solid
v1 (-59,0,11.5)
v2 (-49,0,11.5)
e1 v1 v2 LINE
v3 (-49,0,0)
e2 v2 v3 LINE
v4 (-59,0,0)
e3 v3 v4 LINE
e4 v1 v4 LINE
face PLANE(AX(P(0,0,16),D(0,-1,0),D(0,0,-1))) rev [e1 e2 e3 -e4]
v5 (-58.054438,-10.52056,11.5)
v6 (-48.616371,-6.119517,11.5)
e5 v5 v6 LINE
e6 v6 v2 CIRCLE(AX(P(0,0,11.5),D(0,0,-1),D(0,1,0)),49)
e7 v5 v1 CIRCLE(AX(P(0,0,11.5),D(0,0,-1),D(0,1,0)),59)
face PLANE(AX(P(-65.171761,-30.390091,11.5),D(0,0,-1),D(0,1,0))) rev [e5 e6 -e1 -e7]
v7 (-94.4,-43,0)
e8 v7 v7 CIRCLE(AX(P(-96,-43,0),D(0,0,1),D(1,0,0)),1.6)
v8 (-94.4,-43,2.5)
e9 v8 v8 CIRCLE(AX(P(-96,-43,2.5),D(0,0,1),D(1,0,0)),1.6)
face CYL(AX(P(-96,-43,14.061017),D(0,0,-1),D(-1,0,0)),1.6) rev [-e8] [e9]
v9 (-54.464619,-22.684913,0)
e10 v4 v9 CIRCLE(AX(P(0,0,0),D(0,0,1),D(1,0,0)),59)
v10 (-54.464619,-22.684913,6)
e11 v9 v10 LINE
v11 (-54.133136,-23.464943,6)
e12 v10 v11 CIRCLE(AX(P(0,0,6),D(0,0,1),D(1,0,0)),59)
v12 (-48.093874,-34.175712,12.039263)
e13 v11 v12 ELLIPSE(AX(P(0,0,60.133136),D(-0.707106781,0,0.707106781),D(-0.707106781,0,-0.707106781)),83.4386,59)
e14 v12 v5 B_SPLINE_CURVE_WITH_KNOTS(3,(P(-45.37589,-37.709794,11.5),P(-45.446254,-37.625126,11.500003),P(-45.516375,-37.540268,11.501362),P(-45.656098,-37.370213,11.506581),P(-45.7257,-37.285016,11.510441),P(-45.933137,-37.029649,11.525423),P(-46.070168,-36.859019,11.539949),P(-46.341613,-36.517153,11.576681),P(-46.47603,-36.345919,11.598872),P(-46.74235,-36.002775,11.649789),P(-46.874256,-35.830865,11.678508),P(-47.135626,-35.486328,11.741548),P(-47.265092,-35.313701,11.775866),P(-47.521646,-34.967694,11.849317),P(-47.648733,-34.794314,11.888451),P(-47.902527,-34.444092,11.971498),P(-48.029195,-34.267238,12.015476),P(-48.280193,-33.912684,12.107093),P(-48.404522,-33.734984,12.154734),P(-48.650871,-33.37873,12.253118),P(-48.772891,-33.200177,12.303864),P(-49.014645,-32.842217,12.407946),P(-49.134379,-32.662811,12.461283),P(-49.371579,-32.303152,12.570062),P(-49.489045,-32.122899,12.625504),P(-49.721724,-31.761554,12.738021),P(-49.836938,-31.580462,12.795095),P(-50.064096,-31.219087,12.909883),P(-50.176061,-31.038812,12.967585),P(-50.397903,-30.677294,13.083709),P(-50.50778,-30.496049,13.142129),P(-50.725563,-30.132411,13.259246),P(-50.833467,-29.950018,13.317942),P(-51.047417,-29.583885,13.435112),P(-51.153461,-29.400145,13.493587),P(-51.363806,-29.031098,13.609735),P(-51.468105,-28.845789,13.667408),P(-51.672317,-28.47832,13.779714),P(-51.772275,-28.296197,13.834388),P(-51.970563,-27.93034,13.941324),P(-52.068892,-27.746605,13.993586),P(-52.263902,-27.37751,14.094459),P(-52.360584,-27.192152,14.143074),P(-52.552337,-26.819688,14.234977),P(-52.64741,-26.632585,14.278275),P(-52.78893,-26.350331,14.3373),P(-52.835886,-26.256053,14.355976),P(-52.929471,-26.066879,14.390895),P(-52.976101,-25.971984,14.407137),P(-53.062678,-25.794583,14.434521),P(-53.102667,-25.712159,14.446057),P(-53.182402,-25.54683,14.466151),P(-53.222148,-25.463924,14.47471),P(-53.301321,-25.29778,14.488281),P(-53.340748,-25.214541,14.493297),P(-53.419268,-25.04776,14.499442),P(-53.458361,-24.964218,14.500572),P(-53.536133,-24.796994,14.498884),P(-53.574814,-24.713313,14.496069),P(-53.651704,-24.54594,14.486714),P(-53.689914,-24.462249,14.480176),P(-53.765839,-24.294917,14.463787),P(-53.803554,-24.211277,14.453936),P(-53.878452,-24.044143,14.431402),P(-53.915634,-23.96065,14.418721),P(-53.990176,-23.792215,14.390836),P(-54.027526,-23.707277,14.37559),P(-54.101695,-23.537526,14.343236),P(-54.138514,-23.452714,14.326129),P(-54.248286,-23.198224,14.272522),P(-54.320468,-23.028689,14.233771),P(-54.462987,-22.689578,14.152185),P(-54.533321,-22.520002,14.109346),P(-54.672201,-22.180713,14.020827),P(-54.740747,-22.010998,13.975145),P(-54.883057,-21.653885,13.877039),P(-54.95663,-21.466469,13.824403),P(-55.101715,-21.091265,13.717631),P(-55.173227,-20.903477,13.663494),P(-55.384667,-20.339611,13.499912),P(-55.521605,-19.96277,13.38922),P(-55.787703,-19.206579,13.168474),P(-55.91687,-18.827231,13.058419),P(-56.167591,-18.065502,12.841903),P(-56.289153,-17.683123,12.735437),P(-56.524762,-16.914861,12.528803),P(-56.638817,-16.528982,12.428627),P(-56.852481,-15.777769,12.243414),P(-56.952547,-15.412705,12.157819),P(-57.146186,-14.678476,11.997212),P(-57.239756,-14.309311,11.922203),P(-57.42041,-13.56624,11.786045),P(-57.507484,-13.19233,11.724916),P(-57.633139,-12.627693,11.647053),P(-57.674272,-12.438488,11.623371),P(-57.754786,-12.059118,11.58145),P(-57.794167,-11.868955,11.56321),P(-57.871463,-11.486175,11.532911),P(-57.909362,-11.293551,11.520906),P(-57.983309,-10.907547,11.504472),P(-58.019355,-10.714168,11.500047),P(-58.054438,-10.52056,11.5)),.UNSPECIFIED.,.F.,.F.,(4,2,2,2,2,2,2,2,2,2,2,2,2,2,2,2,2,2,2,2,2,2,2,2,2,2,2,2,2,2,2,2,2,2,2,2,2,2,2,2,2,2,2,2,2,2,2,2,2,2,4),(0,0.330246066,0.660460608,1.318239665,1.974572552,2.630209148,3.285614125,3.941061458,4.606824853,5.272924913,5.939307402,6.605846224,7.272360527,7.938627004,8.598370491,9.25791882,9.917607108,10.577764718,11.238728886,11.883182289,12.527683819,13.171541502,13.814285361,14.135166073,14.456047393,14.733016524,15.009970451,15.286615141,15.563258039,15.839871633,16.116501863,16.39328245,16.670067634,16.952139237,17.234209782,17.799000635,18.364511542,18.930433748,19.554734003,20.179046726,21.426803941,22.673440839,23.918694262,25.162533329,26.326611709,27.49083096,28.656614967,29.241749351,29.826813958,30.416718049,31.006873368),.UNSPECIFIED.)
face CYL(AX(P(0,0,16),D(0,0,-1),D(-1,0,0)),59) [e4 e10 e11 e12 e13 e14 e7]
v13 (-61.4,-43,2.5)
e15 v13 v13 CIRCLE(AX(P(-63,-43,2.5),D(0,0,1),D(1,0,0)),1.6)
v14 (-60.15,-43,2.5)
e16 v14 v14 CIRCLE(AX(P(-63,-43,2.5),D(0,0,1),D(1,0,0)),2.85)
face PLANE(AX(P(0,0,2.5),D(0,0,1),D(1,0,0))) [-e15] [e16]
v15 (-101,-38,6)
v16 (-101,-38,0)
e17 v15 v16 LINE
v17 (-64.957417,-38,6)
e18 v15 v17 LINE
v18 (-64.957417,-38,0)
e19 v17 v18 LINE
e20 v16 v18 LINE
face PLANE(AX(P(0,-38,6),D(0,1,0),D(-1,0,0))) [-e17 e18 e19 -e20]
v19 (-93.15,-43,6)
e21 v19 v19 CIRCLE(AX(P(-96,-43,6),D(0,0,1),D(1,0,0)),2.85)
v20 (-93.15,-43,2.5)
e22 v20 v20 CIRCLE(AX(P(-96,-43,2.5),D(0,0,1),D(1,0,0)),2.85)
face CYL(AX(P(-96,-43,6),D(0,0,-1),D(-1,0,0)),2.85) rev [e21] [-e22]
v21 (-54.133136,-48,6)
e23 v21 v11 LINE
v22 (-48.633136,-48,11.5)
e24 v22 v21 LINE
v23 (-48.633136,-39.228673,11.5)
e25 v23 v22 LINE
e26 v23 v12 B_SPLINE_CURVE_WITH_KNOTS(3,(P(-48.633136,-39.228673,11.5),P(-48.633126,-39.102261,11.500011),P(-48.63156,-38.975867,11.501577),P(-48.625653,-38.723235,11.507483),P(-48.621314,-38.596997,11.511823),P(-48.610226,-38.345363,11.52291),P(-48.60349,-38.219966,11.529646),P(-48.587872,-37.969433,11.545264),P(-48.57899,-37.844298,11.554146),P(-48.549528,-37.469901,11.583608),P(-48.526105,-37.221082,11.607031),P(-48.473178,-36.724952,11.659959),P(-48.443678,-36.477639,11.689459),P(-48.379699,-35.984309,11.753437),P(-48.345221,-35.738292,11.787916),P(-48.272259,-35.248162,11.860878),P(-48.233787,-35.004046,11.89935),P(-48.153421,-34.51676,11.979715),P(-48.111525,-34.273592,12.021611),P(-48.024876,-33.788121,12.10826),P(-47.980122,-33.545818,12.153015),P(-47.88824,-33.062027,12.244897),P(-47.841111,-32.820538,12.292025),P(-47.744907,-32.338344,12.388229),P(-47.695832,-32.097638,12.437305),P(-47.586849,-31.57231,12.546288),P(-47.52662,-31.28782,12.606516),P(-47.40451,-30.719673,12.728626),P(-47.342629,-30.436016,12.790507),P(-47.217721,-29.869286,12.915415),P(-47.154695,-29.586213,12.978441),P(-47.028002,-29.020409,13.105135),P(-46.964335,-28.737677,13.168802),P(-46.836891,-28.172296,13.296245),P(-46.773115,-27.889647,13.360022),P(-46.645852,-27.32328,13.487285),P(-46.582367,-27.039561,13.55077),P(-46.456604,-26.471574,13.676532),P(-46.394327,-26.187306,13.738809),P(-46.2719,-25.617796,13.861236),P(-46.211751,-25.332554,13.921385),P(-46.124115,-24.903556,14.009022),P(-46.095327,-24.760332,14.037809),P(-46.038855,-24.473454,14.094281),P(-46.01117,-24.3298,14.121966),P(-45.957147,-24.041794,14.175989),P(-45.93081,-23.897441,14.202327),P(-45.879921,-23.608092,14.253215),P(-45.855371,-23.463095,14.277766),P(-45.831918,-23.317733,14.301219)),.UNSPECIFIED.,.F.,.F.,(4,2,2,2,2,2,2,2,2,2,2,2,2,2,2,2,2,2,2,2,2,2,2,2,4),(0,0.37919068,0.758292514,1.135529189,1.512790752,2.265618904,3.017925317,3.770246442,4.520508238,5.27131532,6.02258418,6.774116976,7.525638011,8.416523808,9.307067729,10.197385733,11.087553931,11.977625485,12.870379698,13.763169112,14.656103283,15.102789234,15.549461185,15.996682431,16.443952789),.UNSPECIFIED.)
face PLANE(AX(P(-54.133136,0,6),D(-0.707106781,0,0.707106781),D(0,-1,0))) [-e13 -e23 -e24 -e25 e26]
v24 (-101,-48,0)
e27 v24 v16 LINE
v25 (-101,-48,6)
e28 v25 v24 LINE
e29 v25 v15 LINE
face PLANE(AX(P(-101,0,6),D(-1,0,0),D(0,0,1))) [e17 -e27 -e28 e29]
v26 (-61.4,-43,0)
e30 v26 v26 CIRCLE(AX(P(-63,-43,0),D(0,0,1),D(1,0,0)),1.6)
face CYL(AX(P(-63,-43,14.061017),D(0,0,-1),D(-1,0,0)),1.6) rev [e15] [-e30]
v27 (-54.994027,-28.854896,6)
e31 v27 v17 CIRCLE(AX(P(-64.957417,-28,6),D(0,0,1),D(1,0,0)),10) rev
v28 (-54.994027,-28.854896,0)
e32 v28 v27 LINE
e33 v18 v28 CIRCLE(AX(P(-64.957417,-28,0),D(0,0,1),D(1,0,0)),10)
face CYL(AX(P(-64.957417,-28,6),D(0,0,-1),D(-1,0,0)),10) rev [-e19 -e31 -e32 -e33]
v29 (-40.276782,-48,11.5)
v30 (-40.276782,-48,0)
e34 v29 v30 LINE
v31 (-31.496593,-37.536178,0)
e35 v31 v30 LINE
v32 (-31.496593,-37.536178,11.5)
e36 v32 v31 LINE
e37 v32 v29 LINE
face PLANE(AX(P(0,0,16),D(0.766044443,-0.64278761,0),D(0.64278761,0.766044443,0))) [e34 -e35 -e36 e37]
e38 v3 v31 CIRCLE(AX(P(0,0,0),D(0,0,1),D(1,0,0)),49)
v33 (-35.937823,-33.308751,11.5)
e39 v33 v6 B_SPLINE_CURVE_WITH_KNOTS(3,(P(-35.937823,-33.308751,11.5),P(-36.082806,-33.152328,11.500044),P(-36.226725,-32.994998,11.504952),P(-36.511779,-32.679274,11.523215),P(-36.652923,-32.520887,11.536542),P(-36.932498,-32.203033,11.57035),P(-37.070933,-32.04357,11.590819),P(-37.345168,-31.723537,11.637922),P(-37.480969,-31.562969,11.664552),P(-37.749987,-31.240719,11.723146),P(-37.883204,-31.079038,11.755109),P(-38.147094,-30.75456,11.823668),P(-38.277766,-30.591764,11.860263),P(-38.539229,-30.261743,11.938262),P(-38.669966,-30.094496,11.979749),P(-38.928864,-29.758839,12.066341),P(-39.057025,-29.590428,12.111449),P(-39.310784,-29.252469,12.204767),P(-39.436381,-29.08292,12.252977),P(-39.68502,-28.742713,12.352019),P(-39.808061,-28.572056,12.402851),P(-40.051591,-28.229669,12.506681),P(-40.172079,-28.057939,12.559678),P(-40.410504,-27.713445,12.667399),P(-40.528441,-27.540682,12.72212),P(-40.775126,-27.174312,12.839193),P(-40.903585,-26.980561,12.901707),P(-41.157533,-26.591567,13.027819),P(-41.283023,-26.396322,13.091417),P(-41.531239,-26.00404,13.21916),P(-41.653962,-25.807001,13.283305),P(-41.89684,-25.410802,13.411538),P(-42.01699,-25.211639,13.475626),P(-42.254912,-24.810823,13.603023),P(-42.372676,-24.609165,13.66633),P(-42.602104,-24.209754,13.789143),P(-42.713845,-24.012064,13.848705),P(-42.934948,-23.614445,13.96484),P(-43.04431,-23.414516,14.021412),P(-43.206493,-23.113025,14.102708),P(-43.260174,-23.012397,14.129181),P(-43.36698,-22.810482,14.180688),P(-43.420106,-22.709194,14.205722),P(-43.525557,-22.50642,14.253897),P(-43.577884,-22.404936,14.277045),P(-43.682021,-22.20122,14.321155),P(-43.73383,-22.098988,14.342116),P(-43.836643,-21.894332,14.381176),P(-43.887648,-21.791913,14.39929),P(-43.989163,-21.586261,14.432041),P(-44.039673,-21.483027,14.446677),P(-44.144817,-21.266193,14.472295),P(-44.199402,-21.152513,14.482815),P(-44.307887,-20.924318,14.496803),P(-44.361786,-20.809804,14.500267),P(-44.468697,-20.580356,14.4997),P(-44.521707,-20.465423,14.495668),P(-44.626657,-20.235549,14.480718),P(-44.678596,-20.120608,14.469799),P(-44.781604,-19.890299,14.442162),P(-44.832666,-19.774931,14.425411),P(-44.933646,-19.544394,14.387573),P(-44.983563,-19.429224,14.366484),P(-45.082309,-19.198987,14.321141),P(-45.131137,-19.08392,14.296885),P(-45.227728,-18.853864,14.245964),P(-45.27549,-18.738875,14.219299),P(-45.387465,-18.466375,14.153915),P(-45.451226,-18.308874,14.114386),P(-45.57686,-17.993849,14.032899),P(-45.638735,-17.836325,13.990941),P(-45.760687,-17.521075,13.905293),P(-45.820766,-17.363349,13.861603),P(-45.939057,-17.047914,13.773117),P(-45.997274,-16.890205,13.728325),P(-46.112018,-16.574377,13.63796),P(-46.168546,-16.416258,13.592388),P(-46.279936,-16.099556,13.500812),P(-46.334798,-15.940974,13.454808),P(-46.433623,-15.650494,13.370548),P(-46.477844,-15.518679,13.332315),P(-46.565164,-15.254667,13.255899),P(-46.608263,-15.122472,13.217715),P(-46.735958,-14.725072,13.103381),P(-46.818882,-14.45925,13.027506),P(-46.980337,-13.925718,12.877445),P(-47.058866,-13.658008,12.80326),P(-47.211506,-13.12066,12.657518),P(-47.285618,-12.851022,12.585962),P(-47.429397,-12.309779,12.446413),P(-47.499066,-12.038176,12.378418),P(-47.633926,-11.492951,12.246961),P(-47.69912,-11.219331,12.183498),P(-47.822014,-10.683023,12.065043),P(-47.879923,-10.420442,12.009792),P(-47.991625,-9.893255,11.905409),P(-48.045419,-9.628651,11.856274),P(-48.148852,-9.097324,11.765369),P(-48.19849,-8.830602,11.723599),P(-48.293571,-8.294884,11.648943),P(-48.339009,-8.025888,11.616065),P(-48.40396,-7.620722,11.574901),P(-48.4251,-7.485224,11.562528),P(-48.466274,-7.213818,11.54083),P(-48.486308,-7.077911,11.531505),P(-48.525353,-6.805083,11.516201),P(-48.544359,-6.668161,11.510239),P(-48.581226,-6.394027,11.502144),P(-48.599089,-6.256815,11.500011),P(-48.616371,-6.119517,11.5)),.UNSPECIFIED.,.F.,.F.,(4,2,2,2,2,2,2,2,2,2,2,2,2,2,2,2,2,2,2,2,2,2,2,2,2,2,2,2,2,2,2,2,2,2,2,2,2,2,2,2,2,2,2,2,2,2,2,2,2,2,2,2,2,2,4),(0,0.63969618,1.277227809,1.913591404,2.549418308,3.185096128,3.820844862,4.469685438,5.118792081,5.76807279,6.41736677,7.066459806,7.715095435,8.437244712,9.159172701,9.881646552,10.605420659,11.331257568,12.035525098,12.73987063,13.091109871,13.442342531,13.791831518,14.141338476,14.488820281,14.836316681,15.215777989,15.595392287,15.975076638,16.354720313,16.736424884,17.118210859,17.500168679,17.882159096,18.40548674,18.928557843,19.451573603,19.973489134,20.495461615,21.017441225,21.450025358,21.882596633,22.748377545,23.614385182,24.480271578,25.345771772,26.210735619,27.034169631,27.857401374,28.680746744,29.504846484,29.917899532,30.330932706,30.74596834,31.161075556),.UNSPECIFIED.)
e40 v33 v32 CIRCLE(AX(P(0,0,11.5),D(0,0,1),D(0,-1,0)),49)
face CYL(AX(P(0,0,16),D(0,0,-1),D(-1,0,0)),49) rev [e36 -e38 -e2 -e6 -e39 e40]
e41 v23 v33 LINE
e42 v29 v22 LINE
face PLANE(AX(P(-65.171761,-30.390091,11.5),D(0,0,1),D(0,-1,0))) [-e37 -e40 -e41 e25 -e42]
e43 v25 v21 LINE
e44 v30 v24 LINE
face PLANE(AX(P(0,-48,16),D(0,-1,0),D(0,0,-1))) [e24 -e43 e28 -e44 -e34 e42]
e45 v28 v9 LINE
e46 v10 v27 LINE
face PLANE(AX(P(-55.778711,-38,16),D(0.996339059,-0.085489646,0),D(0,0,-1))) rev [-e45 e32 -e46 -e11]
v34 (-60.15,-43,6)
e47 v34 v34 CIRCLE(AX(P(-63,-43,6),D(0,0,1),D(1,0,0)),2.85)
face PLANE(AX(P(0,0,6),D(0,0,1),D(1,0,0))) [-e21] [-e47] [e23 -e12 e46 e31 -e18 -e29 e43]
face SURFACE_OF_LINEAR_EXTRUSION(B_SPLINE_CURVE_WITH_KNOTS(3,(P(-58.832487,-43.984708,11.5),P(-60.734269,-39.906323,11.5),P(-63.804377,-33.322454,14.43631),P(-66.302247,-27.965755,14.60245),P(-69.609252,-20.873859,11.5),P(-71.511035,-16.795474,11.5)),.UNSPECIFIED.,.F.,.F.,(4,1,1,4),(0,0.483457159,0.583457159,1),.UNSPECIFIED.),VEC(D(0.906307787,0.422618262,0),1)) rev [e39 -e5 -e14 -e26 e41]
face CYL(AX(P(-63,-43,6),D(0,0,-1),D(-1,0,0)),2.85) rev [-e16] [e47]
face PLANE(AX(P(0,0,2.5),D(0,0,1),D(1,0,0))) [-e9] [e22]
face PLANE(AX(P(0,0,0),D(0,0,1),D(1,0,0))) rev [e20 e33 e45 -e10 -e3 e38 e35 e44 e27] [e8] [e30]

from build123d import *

# Parameters (mm, degrees)
BOSS_EXTRUDE1_DEPTH = 16
SKETCH1_3_W         = 10
SKETCH1_3_H         = 55.866863614
SKETCH1_3_R         = 2.85
BOSS_EXTRUDE2_DEPTH = 6
SKETCH1_4_R         = 2.85
SKETCH1_4_R_2       = 1.6
BOSS_EXTRUDE3_DEPTH = 2.5
CHAMFER3_SIZE       = 10.645574538
CHAMFER4_SIZE       = 9
CUT_EXTRUDE2_DEPTH  = 27.5
FILLET1_R           = 10


with BuildPart() as part:
    # Sketch1 → Boss-Extrude1 (new body)
    with BuildSketch(Plane(origin=(0, 0, 0), x_dir=(0, 1, 0), z_dir=(0, 0, 1))):
        with BuildLine():
            Line((-40.217333264, 33.746349509), (-37.536177713, 31.496592875))
            ThreePointArc((-37.536177713, 31.496592875), (-20.708294825, 44.409081565), (0, 49))
            Line((0, 49), (0, 52.5))
            Line((0, 52.5), (0, 59))
            ThreePointArc((0, 59), (-20.225540206, 55.42497202), (-38, 45.133136386))
            Line((-38, 45.133136386), (-48, 45.133136386))
            Line((-48, 45.133136386), (-48, 40.276782297))
            Line((-48, 40.276782297), (-40.217333264, 33.746349509))
        make_face()
    extrude(amount=BOSS_EXTRUDE1_DEPTH)

    # Sketch1<3> → Boss-Extrude2 (add)
    with BuildSketch(Plane(origin=(0, 0, 0), x_dir=(0, 1, 0), z_dir=(0, 0, 1))):
        with Locations((-43, 73.066568193)):
            Rectangle(SKETCH1_3_W, SKETCH1_3_H)
        with Locations(Location((-43, 96, 0), (0, 0, 270))):
            Circle(SKETCH1_3_R, mode=Mode.SUBTRACT)
        with Locations(Location((-43, 63, 0), (0, 0, 270))):
            Circle(SKETCH1_3_R, mode=Mode.SUBTRACT)
    extrude(amount=BOSS_EXTRUDE2_DEPTH)

    # Sketch1<4> → Boss-Extrude3 (add)
    # profile 1 of 2: a face of its own
    with BuildSketch(Plane(origin=(0, 0, 0), x_dir=(0, 1, 0), z_dir=(0, 0, 1))):
        with Locations(Location((-43, 96, 0), (0, 0, 270))):
            Circle(SKETCH1_4_R)
        with Locations(Location((-43, 96, 0), (0, 0, 270))):
            Circle(SKETCH1_4_R_2, mode=Mode.SUBTRACT)
    # profile 2 of 2: a face of its own
    with BuildSketch(Plane(origin=(0, 0, 0), x_dir=(0, 1, 0), z_dir=(0, 0, 1))):
        with Locations(Location((-43, 63, 0), (0, 0, 270))):
            Circle(SKETCH1_4_R)
        with Locations(Location((-43, 63, 0), (0, 0, 270))):
            Circle(SKETCH1_4_R_2, mode=Mode.SUBTRACT)
    extrude(amount=BOSS_EXTRUDE3_DEPTH)

    # Chamfer3
    # the kernel refuses this chamfer: 15, 10.645574538 mm, written as the material it adds along each edge
    with BuildSketch(Plane(origin=(-45.133136386, -38, 0), x_dir=(-0.520323475299402, 0.8539692506480269, 0), z_dir=(0, 0, 1))) as chamfer3_piece_1_section:
        with BuildLine():
            Line((17.934002299, 0), (CHAMFER3_SIZE * 0.520323475317, CHAMFER3_SIZE * 0.853969250677))
            Line((CHAMFER3_SIZE * 0.520323475317, CHAMFER3_SIZE * 0.853969250677), (0, 0))
            ThreePointArc((0, 0), (9.212497423, 0.684886528), (17.934002299, 0))
        make_face()
    chamfer3_piece_1 = extrude(amount=6, mode=Mode.PRIVATE)
    chamfer3_piece_1 = split(chamfer3_piece_1, bisect_by=Plane(origin=(-45.133136386, -38, 0), z_dir=(-1, 0, 0)), keep=Keep.TOP, mode=Mode.PRIVATE)
    add(chamfer3_piece_1)

    # Chamfer4
    chamfer4_edges = [part.edges().sort_by_distance(p)[0] for p in [
        (-45.133136386, -43, 6),
    ]]
    chamfer(chamfer4_edges, length=CHAMFER4_SIZE)

    # Sketch3 → Cut-Extrude2 (cut)
    with BuildSketch(Plane(origin=(-40.248296437, -18.768088856, 0), x_dir=(0, 0, -1), z_dir=(0.9063077870366554, 0.42261826174068795, 0))):
        with BuildLine():
            Line((-11.5, -15), (-11.5, -26.481070055))
            Line((-11.5, -26.481070055), (-21.940266499, -26.481070055))
            Line((-21.940266499, -26.481070055), (-21.940266499, 24.934477443))
            Line((-21.940266499, 24.934477443), (-11.5, 24.934477443))
            Line((-11.5, 24.934477443), (-11.5, 15))
            add(Edge.make_bspline(
                [(-11.5, -15), (-11.5, -10.5), (-14.436309762, -3.235504373), (-14.602449576, 2.674959083), (-11.5, 10.5), (-11.5, 15)],
                knots=[0, 0, 0, 0, 0.483457159, 0.583457159, 1, 1, 1, 1], degree=3))
        make_face()
    extrude(amount=-CUT_EXTRUDE2_DEPTH, mode=Mode.SUBTRACT)

    # Fillet1
    fillet1_edges = [part.edges().sort_by_distance(p)[0] for p in [
        (-55.778710924, -38, 3),
    ]]
    fillet(fillet1_edges, radius=FILLET1_R)


solid = part.part
